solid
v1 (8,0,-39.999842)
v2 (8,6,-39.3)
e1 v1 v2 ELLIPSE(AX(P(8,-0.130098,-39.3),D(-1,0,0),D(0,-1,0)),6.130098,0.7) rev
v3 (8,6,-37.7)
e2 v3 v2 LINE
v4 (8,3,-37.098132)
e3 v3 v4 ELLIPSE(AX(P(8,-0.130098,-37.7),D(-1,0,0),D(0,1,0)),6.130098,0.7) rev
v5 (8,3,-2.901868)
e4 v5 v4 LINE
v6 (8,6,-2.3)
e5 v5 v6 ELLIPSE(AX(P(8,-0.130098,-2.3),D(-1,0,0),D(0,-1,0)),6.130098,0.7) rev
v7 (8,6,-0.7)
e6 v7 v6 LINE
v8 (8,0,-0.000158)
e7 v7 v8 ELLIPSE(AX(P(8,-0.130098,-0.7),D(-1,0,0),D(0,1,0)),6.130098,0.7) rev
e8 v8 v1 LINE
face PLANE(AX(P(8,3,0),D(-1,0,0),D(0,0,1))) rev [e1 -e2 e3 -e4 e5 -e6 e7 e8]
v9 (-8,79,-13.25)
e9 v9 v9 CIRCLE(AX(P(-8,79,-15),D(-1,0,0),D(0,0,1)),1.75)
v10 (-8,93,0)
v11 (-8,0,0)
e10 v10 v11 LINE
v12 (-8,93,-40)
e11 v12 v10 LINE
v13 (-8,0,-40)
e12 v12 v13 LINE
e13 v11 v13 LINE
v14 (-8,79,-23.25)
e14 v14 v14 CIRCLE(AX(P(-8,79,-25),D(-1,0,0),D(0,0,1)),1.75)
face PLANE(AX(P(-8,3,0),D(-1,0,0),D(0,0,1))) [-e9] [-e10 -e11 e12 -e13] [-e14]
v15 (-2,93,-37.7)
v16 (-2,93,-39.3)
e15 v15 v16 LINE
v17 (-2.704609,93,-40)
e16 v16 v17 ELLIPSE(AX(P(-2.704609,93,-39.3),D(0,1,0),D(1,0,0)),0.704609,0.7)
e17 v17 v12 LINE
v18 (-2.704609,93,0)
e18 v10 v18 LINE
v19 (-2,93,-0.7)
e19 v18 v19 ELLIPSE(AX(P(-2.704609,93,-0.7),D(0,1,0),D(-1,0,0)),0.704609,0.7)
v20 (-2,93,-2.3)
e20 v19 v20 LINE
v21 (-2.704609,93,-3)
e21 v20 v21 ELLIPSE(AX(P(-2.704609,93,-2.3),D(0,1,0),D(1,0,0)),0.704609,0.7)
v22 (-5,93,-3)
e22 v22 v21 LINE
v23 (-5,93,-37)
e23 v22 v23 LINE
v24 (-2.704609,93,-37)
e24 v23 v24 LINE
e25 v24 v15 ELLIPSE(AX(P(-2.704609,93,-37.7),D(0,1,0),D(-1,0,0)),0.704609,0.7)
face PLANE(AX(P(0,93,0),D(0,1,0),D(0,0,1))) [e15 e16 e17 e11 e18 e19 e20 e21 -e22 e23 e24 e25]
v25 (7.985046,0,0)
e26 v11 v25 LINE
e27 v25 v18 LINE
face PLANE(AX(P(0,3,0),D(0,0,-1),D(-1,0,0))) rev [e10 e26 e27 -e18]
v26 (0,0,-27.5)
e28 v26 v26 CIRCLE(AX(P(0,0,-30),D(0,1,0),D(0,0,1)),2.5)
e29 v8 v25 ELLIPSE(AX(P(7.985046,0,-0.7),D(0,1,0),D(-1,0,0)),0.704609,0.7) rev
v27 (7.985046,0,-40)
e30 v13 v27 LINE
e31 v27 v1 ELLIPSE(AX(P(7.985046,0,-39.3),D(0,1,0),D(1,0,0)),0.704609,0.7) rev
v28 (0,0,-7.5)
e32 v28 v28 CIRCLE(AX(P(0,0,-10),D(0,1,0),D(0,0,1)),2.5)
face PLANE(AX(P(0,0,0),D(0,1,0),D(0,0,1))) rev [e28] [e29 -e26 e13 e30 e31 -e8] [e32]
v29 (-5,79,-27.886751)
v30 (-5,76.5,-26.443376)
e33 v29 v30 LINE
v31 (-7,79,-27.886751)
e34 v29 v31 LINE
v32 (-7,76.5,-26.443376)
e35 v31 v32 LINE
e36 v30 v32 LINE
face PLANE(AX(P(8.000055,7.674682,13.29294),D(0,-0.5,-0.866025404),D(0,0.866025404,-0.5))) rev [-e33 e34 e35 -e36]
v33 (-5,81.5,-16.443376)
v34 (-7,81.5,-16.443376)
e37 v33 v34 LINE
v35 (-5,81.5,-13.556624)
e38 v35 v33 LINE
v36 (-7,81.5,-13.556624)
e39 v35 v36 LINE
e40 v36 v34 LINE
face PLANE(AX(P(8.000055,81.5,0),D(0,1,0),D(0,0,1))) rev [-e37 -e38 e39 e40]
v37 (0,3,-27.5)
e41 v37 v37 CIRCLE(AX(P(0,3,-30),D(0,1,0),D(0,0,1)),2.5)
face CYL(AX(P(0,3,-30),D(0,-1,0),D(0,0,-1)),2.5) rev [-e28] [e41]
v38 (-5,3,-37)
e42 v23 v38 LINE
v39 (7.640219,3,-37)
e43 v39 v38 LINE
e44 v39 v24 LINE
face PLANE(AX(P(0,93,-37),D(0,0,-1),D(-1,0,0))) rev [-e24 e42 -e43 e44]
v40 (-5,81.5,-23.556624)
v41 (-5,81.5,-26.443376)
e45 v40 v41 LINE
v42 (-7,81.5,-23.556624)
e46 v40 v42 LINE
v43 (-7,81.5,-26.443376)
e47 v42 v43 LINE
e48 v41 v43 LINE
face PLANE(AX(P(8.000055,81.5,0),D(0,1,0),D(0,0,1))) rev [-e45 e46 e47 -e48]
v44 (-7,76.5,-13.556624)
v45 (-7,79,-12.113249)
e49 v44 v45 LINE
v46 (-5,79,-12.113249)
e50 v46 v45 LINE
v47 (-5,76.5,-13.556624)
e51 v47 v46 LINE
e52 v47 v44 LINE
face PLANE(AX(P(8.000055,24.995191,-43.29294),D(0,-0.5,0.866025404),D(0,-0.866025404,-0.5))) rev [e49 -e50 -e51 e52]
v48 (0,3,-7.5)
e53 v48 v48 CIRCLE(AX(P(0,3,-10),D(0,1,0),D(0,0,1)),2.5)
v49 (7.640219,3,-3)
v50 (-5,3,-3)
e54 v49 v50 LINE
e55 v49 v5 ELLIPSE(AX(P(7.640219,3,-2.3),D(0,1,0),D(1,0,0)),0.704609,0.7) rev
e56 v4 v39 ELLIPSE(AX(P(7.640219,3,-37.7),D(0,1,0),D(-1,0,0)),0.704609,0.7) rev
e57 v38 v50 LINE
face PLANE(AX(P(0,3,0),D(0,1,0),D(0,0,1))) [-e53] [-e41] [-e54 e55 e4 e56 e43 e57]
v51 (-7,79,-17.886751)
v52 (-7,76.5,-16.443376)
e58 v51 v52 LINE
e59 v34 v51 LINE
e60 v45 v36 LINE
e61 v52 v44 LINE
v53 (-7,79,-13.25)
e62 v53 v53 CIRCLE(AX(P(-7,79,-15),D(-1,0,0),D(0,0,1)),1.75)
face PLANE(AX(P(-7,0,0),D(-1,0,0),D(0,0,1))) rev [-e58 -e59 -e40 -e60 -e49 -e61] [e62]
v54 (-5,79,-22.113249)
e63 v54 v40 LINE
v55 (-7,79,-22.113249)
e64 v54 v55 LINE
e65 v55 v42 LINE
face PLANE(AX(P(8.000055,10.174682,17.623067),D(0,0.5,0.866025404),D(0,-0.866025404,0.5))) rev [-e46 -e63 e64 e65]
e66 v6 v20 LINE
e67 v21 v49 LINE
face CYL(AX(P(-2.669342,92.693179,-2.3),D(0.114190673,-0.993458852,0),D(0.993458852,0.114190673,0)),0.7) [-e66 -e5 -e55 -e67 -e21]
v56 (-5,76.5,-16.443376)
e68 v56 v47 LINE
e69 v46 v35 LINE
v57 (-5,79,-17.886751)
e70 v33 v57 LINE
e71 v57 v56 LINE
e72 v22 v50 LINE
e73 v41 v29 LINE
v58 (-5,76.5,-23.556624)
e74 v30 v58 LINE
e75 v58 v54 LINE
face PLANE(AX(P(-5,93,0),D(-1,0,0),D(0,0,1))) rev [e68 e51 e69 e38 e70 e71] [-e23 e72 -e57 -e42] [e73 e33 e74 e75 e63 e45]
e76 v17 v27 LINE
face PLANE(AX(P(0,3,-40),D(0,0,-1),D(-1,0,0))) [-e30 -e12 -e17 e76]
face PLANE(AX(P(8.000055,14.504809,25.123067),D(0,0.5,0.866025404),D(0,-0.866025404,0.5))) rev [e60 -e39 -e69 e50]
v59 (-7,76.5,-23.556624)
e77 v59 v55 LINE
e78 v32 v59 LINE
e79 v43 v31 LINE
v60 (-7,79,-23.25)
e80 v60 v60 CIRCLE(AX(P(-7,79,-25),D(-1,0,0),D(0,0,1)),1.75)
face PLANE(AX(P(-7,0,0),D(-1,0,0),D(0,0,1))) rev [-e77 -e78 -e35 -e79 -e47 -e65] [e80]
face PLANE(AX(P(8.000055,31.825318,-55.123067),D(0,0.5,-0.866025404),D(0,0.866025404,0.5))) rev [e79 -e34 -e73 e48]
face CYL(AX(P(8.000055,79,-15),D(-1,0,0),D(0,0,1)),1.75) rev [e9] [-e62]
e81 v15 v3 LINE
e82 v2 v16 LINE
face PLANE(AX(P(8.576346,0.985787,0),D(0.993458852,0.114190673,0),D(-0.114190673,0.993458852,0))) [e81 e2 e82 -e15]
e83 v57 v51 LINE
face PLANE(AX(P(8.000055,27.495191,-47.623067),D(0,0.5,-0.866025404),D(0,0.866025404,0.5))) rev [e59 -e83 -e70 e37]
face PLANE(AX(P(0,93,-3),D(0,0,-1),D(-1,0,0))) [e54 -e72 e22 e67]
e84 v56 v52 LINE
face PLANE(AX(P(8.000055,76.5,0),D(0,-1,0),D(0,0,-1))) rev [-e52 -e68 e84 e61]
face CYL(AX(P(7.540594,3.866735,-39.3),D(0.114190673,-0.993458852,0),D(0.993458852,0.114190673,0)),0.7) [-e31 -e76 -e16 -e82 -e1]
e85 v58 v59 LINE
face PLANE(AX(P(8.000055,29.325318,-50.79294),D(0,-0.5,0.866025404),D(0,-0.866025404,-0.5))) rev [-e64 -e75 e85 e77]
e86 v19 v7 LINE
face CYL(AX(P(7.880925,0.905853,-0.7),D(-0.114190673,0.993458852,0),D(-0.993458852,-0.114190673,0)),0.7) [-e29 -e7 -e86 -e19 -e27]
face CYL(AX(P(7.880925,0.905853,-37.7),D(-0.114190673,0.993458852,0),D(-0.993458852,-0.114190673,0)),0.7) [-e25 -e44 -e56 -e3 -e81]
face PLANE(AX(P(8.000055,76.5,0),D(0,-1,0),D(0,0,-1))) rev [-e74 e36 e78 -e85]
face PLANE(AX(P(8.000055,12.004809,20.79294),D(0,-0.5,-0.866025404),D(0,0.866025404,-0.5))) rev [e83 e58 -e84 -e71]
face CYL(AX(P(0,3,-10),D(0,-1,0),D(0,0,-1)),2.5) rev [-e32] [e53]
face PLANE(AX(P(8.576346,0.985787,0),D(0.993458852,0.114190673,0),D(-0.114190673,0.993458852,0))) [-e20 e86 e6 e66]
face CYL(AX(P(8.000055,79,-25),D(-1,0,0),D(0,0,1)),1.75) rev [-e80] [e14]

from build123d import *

# Parameters (mm, degrees)
SKETCH1_W               = 16
SKETCH1_H               = 40
SKETCH1_R               = 2.5
BOSS_EXTRUDE1_DEPTH     = 3
BOSS_EXTRUDE3_START     = -3
SKETCH2_W               = 13
SKETCH2_H               = 3
SKETCH2_W_2             = 3
SKETCH2_H_2             = 34
BOSS_EXTRUDE3_DEPTH     = 93
CUT_EXTRUDE1_DEPTH      = 102.552941858
CUT_EXTRUDE1_DEPTH_BACK = 102.552941858
CUT_EXTRUDE2_START      = -1
SKETCH4_R               = 1.75
CUT_EXTRUDE2_DEPTH      = 102.493902258
SKETCH4_AGAIN_R         = 1.75
CUT_EXTRUDE3_DEPTH      = 103.493902258
FILLET1_R               = 0.7


with BuildPart() as part:
    # Sketch1 → Boss-Extrude1 (new body)
    with BuildSketch(Plane(origin=(0, 0, 0), x_dir=(1, 0, 0), z_dir=(0, 1, 0))):
        with Locations((0, 20)):
            Rectangle(SKETCH1_W, SKETCH1_H)
        with Locations(Location((0, 30, 0), (0, 0, 270))):
            Circle(SKETCH1_R, mode=Mode.SUBTRACT)
        with Locations(Location((0, 10, 0), (0, 0, 270))):
            Circle(SKETCH1_R, mode=Mode.SUBTRACT)
    extrude(amount=BOSS_EXTRUDE1_DEPTH)

    # Sketch2 → Boss-Extrude3 (add)
    with BuildSketch(Plane(origin=(0, 3, 0), x_dir=(1, 0, 0), z_dir=(0, 1, 0)).offset(BOSS_EXTRUDE3_START)):
        with Locations((1.5, 38.5)):
            Rectangle(SKETCH2_W, SKETCH2_H)
        with Locations((-6.5, 38.5)):
            Rectangle(SKETCH2_W_2, SKETCH2_H)
        with Locations((-6.5, 20)):
            Rectangle(SKETCH2_W_2, SKETCH2_H_2)
        with Locations((-6.5, 1.5)):
            Rectangle(SKETCH2_W_2, SKETCH2_H)
        with Locations((1.5, 1.5)):
            Rectangle(SKETCH2_W, SKETCH2_H)
    extrude(amount=BOSS_EXTRUDE3_DEPTH)

    # Sketch3 → Cut-Extrude1 (cut, two sides: drawn at the far end of the back side and taken through both)
    with BuildSketch(Plane(origin=(0, 0, -40), x_dir=(-1, 0, 0), z_dir=(0, 0, -1)).offset(-CUT_EXTRUDE1_DEPTH_BACK)):
        Polygon((-8, 6), (2, 93), (-8, 93), align=None)
    extrude(amount=CUT_EXTRUDE1_DEPTH + CUT_EXTRUDE1_DEPTH_BACK, mode=Mode.SUBTRACT)

    # Sketch4 → Cut-Extrude2 (cut, through all)
    # profile 1 of 2: a face of its own
    with BuildSketch(Plane.ZY.offset(8).offset(CUT_EXTRUDE2_START)):
        Polygon((-13.556624327, 76.5), (-12.113248654, 79), (-13.556624327, 81.5), (-16.443375673, 81.5), (-17.886751346, 79), (-16.443375673, 76.5), align=None)
        with Locations((-15, 79)):
            Circle(SKETCH4_R, mode=Mode.SUBTRACT)
    # profile 2 of 2: a face of its own
    with BuildSketch(Plane.ZY.offset(8).offset(CUT_EXTRUDE2_START)):
        Polygon((-23.556624327, 76.5), (-22.113248654, 79), (-23.556624327, 81.5), (-26.443375673, 81.5), (-27.886751346, 79), (-26.443375673, 76.5), align=None)
        with Locations((-25, 79)):
            Circle(SKETCH4_R, mode=Mode.SUBTRACT)
    extrude(amount=-CUT_EXTRUDE2_DEPTH, mode=Mode.SUBTRACT)

    # Sketch4 again → Cut-Extrude3 (cut, through all)
    with BuildSketch(Plane.ZY.offset(8)):
        with Locations((-25, 79)):
            Circle(SKETCH4_AGAIN_R)
        with Locations((-15, 79)):
            Circle(SKETCH4_AGAIN_R)
    extrude(amount=-CUT_EXTRUDE3_DEPTH, mode=Mode.SUBTRACT)

    # Fillet1
    fillet1_edges = [part.edges().sort_by_distance(p)[0] for p in [
        (3, 49.5, 0),
    ]]
    fillet(fillet1_edges, radius=FILLET1_R)
    fillet1_2_edges = [part.edges().sort_by_distance(p)[0] for p in [
        (3, 49.5, -3),
    ]]
    fillet(fillet1_2_edges, radius=FILLET1_R)
    fillet1_3_edges = [part.edges().sort_by_distance(p)[0] for p in [
        (3, 49.5, -40),
    ]]
    fillet(fillet1_3_edges, radius=FILLET1_R)
    fillet1_4_edges = [part.edges().sort_by_distance(p)[0] for p in [
        (3, 49.5, -37),
    ]]
    fillet(fillet1_4_edges, radius=FILLET1_R)


solid = part.part
